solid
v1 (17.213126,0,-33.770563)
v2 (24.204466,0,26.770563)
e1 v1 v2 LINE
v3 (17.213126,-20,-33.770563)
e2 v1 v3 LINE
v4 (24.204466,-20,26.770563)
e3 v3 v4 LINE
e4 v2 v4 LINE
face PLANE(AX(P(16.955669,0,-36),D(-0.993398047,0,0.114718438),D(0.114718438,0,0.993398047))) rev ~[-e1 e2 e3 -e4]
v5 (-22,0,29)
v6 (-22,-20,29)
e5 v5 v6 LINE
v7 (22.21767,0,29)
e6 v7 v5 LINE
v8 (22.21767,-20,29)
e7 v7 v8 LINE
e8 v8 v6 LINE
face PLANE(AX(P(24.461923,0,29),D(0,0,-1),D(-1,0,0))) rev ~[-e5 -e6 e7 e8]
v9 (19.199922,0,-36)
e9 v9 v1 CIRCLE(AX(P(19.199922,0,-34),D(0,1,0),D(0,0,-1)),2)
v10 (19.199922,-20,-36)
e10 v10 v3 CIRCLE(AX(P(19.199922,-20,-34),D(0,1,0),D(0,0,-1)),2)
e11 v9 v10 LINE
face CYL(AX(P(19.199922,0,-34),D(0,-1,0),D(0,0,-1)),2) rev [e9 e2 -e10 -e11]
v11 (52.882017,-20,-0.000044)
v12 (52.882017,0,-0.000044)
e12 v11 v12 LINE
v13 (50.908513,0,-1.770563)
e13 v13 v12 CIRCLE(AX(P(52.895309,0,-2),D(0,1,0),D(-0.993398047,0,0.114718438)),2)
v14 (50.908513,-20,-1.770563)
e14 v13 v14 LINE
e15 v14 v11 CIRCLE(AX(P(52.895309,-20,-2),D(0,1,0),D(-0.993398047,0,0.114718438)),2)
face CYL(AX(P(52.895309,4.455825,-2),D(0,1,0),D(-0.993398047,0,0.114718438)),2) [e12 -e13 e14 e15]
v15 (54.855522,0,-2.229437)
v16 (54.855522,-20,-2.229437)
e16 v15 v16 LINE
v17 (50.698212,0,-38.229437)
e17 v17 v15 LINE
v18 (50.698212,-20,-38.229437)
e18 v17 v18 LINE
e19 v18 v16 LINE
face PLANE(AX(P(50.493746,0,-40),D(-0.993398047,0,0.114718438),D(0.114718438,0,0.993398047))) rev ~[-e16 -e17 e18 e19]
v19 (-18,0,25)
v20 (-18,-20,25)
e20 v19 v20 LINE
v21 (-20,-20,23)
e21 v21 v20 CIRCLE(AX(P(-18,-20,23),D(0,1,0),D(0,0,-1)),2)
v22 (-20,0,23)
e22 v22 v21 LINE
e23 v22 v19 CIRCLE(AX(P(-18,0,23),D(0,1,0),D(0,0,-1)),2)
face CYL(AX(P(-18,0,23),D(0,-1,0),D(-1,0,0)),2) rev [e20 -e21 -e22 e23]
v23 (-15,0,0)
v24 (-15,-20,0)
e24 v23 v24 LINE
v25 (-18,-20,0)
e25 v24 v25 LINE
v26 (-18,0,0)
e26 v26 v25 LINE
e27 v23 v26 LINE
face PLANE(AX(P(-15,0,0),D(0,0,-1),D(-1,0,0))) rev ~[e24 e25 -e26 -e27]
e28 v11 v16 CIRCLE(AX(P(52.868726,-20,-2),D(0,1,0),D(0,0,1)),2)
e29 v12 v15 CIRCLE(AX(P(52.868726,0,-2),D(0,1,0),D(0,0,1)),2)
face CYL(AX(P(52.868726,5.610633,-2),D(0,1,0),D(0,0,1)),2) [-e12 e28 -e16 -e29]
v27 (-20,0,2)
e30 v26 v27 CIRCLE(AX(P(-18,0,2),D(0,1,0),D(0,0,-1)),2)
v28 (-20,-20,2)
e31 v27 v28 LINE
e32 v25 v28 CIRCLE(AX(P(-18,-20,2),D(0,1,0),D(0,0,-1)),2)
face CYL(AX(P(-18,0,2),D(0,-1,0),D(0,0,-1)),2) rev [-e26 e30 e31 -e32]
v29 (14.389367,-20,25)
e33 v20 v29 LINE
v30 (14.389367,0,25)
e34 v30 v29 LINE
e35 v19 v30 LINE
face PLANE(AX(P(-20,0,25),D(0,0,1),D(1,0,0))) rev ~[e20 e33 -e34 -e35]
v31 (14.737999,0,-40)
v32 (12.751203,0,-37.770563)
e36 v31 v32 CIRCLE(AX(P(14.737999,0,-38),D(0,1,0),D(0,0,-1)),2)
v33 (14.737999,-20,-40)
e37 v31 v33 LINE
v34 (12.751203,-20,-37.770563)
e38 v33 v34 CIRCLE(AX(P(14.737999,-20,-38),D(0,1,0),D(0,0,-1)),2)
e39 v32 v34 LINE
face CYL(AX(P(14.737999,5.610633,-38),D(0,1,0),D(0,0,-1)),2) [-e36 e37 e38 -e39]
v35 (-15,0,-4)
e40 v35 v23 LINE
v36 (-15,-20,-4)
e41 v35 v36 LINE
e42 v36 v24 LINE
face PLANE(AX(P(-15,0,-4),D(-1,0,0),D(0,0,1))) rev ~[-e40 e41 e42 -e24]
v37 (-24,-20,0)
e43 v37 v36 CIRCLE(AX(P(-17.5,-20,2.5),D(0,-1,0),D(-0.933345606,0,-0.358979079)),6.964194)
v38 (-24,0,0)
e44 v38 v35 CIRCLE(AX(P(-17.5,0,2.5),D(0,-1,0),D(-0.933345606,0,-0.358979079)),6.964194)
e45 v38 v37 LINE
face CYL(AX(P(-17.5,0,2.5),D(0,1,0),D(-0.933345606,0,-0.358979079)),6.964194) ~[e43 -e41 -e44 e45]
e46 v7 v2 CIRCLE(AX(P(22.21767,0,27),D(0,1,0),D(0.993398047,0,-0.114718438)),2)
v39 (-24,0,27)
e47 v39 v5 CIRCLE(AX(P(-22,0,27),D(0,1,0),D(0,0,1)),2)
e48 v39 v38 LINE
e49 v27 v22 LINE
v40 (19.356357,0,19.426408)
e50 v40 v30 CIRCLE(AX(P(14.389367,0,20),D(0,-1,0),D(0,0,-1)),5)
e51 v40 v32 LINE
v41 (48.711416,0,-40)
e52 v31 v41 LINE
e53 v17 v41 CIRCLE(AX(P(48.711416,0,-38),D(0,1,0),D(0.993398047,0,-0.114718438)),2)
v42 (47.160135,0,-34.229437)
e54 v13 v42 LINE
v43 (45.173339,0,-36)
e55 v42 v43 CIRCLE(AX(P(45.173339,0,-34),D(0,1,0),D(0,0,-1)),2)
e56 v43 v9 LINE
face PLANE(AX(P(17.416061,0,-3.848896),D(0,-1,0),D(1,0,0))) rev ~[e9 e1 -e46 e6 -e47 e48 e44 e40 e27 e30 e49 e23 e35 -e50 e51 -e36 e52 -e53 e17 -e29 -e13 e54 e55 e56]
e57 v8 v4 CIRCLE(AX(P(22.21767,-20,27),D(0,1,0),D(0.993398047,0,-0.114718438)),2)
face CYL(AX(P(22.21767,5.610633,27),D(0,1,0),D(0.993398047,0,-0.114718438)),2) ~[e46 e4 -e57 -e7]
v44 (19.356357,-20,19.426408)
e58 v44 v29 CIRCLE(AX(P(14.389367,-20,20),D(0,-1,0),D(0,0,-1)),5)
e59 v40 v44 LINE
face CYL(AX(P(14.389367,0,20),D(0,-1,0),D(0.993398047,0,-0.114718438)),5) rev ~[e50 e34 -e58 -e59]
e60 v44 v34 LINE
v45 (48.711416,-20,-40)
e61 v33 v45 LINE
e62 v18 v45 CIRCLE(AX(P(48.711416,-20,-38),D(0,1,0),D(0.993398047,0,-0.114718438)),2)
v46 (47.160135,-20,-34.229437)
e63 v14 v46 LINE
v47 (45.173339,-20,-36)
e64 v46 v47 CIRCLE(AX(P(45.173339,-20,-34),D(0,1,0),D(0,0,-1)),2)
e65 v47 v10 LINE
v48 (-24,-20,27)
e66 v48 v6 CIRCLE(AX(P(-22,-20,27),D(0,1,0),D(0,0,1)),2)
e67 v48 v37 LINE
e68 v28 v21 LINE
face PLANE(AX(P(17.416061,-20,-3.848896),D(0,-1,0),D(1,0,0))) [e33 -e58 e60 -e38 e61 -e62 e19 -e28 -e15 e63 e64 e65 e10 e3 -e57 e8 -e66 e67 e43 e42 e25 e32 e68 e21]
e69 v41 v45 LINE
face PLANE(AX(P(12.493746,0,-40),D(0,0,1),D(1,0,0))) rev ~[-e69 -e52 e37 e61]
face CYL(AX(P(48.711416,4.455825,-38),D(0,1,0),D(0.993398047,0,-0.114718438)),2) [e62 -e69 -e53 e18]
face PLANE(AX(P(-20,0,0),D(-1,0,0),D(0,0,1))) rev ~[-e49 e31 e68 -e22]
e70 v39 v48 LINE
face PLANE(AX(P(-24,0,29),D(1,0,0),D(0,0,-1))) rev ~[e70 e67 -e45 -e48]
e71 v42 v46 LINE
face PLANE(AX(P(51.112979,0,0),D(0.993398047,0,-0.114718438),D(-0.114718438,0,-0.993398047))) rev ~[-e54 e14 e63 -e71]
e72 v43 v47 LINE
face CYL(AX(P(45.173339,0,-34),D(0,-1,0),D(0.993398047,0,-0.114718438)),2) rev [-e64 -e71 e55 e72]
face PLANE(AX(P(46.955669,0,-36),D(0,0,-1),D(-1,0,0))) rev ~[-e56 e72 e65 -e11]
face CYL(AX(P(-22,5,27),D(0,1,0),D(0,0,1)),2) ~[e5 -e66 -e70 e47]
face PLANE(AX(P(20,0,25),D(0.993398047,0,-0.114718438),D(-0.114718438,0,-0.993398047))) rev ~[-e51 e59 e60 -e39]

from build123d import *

# Parameters (mm, degrees)
F1_DEPTH    = 20
F2_R        = 2
F3_T1_DEPTH = 30
F3_T3_DEPTH = 31.2212666506
F3_T5_DEPTH = 28.9116499156
F4_R        = 5


# Not quite as in the source:
# - a fillet or chamfer that OpenCascade refuses, or shapes differently, is made with other operations: its cross-section is extruded or revolved along the edge and cut away or added


with BuildPart() as f1:
    # F0 (on Front) → F1 (new body)
    with BuildSketch(Plane.XZ):
        Polygon((-24, 29), (-24, 0), (-20, 0), (-20, 25), (20, 25), (12.4937456114, -40), (50.4937456114, -40), (55.1129790813, 0), (51.1129790813, 0), (46.9556689583, -36), (16.9556689583, -36), (24.461923347, 29), align=None)
        with BuildLine():
            Line((-20, 0), (-24, 0))
            ThreePointArc((-24, 0), (-20.3284271247, -3.8639610307), (-15, -4))
            Line((-15, -4), (-15, 0))
            Line((-15, 0), (-20, 0))
        make_face()
    extrude(amount=F1_DEPTH)

    # F2
    f2_edges = [f1.edges().sort_by_distance(p)[0] for p in [
        (-20, -10, 0),
        (-20, -10, 25),
        (16.955669, -10, -36),
        (46.955669, -10, -36),
    ]]
    fillet(f2_edges, radius=F2_R)

    # F3: fillet of radius 2 on 6 edges, made by hand

    # F3_s2 → F3_t1 (cut)
    with BuildSketch(Plane.XZ.offset(-5)):
        with BuildLine():
            ThreePointArc((-22, 29), (-23.4142135624, 28.4142135624), (-24, 27))
            Line((-24, 27), (-24, 29))
            Line((-24, 29), (-22, 29))
        make_face()
    extrude(amount=F3_T1_DEPTH, mode=Mode.SUBTRACT)

    # F3_s4 → F3_t3 (cut)
    with BuildSketch(Plane.XZ.offset(-5.6106333253)):
        with BuildLine():
            ThreePointArc((24.2044661111, 26.7705631246), (23.7107999092, 28.3306250879), (22.2176700169, 29))
            Line((22.2176700169, 29), (24.461923347, 29))
            Line((24.461923347, 29), (24.2044661111, 26.7705631246))
        make_face()
        with BuildLine():
            ThreePointArc((14.7379989415, -40), (13.2448690491, -39.3306250879), (12.7512028472, -37.7705631246))
            Line((12.7512028472, -37.7705631246), (12.4937456114, -40))
            Line((12.4937456114, -40), (14.7379989415, -40))
        make_face()
        with BuildLine():
            ThreePointArc((52.8687257512, 0), (54.3618556435, -0.6693749121), (54.8555218454, -2.2294368754))
            Line((54.8555218454, -2.2294368754), (55.1129790813, 0))
            Line((55.1129790813, 0), (52.8687257512, 0))
        make_face()
    extrude(amount=F3_T3_DEPTH, mode=Mode.SUBTRACT)

    # F3_s6 → F3_t5 (cut)
    with BuildSketch(Plane.XZ.offset(-4.4558249578)):
        with BuildLine():
            ThreePointArc((50.6982117225, -38.2294368754), (50.0420407161, -39.4931298923), (48.7114156282, -40))
            Line((48.7114156282, -40), (50.4937456114, -40))
            Line((50.4937456114, -40), (50.6982117225, -38.2294368754))
        make_face()
        with BuildLine():
            ThreePointArc((50.9085129701, -1.7705631246), (51.5646839765, -0.5068701077), (52.8953090644, 0))
            Line((52.8953090644, 0), (51.1129790813, 0))
            Line((51.1129790813, 0), (50.9085129701, -1.7705631246))
        make_face()
    extrude(amount=F3_T5_DEPTH, mode=Mode.SUBTRACT)

    # F4
    f4_edges = [f1.edges().sort_by_distance(p)[0] for p in [
        (20, -10, 25),
    ]]
    fillet(f4_edges, radius=F4_R)


solid = f1.part
